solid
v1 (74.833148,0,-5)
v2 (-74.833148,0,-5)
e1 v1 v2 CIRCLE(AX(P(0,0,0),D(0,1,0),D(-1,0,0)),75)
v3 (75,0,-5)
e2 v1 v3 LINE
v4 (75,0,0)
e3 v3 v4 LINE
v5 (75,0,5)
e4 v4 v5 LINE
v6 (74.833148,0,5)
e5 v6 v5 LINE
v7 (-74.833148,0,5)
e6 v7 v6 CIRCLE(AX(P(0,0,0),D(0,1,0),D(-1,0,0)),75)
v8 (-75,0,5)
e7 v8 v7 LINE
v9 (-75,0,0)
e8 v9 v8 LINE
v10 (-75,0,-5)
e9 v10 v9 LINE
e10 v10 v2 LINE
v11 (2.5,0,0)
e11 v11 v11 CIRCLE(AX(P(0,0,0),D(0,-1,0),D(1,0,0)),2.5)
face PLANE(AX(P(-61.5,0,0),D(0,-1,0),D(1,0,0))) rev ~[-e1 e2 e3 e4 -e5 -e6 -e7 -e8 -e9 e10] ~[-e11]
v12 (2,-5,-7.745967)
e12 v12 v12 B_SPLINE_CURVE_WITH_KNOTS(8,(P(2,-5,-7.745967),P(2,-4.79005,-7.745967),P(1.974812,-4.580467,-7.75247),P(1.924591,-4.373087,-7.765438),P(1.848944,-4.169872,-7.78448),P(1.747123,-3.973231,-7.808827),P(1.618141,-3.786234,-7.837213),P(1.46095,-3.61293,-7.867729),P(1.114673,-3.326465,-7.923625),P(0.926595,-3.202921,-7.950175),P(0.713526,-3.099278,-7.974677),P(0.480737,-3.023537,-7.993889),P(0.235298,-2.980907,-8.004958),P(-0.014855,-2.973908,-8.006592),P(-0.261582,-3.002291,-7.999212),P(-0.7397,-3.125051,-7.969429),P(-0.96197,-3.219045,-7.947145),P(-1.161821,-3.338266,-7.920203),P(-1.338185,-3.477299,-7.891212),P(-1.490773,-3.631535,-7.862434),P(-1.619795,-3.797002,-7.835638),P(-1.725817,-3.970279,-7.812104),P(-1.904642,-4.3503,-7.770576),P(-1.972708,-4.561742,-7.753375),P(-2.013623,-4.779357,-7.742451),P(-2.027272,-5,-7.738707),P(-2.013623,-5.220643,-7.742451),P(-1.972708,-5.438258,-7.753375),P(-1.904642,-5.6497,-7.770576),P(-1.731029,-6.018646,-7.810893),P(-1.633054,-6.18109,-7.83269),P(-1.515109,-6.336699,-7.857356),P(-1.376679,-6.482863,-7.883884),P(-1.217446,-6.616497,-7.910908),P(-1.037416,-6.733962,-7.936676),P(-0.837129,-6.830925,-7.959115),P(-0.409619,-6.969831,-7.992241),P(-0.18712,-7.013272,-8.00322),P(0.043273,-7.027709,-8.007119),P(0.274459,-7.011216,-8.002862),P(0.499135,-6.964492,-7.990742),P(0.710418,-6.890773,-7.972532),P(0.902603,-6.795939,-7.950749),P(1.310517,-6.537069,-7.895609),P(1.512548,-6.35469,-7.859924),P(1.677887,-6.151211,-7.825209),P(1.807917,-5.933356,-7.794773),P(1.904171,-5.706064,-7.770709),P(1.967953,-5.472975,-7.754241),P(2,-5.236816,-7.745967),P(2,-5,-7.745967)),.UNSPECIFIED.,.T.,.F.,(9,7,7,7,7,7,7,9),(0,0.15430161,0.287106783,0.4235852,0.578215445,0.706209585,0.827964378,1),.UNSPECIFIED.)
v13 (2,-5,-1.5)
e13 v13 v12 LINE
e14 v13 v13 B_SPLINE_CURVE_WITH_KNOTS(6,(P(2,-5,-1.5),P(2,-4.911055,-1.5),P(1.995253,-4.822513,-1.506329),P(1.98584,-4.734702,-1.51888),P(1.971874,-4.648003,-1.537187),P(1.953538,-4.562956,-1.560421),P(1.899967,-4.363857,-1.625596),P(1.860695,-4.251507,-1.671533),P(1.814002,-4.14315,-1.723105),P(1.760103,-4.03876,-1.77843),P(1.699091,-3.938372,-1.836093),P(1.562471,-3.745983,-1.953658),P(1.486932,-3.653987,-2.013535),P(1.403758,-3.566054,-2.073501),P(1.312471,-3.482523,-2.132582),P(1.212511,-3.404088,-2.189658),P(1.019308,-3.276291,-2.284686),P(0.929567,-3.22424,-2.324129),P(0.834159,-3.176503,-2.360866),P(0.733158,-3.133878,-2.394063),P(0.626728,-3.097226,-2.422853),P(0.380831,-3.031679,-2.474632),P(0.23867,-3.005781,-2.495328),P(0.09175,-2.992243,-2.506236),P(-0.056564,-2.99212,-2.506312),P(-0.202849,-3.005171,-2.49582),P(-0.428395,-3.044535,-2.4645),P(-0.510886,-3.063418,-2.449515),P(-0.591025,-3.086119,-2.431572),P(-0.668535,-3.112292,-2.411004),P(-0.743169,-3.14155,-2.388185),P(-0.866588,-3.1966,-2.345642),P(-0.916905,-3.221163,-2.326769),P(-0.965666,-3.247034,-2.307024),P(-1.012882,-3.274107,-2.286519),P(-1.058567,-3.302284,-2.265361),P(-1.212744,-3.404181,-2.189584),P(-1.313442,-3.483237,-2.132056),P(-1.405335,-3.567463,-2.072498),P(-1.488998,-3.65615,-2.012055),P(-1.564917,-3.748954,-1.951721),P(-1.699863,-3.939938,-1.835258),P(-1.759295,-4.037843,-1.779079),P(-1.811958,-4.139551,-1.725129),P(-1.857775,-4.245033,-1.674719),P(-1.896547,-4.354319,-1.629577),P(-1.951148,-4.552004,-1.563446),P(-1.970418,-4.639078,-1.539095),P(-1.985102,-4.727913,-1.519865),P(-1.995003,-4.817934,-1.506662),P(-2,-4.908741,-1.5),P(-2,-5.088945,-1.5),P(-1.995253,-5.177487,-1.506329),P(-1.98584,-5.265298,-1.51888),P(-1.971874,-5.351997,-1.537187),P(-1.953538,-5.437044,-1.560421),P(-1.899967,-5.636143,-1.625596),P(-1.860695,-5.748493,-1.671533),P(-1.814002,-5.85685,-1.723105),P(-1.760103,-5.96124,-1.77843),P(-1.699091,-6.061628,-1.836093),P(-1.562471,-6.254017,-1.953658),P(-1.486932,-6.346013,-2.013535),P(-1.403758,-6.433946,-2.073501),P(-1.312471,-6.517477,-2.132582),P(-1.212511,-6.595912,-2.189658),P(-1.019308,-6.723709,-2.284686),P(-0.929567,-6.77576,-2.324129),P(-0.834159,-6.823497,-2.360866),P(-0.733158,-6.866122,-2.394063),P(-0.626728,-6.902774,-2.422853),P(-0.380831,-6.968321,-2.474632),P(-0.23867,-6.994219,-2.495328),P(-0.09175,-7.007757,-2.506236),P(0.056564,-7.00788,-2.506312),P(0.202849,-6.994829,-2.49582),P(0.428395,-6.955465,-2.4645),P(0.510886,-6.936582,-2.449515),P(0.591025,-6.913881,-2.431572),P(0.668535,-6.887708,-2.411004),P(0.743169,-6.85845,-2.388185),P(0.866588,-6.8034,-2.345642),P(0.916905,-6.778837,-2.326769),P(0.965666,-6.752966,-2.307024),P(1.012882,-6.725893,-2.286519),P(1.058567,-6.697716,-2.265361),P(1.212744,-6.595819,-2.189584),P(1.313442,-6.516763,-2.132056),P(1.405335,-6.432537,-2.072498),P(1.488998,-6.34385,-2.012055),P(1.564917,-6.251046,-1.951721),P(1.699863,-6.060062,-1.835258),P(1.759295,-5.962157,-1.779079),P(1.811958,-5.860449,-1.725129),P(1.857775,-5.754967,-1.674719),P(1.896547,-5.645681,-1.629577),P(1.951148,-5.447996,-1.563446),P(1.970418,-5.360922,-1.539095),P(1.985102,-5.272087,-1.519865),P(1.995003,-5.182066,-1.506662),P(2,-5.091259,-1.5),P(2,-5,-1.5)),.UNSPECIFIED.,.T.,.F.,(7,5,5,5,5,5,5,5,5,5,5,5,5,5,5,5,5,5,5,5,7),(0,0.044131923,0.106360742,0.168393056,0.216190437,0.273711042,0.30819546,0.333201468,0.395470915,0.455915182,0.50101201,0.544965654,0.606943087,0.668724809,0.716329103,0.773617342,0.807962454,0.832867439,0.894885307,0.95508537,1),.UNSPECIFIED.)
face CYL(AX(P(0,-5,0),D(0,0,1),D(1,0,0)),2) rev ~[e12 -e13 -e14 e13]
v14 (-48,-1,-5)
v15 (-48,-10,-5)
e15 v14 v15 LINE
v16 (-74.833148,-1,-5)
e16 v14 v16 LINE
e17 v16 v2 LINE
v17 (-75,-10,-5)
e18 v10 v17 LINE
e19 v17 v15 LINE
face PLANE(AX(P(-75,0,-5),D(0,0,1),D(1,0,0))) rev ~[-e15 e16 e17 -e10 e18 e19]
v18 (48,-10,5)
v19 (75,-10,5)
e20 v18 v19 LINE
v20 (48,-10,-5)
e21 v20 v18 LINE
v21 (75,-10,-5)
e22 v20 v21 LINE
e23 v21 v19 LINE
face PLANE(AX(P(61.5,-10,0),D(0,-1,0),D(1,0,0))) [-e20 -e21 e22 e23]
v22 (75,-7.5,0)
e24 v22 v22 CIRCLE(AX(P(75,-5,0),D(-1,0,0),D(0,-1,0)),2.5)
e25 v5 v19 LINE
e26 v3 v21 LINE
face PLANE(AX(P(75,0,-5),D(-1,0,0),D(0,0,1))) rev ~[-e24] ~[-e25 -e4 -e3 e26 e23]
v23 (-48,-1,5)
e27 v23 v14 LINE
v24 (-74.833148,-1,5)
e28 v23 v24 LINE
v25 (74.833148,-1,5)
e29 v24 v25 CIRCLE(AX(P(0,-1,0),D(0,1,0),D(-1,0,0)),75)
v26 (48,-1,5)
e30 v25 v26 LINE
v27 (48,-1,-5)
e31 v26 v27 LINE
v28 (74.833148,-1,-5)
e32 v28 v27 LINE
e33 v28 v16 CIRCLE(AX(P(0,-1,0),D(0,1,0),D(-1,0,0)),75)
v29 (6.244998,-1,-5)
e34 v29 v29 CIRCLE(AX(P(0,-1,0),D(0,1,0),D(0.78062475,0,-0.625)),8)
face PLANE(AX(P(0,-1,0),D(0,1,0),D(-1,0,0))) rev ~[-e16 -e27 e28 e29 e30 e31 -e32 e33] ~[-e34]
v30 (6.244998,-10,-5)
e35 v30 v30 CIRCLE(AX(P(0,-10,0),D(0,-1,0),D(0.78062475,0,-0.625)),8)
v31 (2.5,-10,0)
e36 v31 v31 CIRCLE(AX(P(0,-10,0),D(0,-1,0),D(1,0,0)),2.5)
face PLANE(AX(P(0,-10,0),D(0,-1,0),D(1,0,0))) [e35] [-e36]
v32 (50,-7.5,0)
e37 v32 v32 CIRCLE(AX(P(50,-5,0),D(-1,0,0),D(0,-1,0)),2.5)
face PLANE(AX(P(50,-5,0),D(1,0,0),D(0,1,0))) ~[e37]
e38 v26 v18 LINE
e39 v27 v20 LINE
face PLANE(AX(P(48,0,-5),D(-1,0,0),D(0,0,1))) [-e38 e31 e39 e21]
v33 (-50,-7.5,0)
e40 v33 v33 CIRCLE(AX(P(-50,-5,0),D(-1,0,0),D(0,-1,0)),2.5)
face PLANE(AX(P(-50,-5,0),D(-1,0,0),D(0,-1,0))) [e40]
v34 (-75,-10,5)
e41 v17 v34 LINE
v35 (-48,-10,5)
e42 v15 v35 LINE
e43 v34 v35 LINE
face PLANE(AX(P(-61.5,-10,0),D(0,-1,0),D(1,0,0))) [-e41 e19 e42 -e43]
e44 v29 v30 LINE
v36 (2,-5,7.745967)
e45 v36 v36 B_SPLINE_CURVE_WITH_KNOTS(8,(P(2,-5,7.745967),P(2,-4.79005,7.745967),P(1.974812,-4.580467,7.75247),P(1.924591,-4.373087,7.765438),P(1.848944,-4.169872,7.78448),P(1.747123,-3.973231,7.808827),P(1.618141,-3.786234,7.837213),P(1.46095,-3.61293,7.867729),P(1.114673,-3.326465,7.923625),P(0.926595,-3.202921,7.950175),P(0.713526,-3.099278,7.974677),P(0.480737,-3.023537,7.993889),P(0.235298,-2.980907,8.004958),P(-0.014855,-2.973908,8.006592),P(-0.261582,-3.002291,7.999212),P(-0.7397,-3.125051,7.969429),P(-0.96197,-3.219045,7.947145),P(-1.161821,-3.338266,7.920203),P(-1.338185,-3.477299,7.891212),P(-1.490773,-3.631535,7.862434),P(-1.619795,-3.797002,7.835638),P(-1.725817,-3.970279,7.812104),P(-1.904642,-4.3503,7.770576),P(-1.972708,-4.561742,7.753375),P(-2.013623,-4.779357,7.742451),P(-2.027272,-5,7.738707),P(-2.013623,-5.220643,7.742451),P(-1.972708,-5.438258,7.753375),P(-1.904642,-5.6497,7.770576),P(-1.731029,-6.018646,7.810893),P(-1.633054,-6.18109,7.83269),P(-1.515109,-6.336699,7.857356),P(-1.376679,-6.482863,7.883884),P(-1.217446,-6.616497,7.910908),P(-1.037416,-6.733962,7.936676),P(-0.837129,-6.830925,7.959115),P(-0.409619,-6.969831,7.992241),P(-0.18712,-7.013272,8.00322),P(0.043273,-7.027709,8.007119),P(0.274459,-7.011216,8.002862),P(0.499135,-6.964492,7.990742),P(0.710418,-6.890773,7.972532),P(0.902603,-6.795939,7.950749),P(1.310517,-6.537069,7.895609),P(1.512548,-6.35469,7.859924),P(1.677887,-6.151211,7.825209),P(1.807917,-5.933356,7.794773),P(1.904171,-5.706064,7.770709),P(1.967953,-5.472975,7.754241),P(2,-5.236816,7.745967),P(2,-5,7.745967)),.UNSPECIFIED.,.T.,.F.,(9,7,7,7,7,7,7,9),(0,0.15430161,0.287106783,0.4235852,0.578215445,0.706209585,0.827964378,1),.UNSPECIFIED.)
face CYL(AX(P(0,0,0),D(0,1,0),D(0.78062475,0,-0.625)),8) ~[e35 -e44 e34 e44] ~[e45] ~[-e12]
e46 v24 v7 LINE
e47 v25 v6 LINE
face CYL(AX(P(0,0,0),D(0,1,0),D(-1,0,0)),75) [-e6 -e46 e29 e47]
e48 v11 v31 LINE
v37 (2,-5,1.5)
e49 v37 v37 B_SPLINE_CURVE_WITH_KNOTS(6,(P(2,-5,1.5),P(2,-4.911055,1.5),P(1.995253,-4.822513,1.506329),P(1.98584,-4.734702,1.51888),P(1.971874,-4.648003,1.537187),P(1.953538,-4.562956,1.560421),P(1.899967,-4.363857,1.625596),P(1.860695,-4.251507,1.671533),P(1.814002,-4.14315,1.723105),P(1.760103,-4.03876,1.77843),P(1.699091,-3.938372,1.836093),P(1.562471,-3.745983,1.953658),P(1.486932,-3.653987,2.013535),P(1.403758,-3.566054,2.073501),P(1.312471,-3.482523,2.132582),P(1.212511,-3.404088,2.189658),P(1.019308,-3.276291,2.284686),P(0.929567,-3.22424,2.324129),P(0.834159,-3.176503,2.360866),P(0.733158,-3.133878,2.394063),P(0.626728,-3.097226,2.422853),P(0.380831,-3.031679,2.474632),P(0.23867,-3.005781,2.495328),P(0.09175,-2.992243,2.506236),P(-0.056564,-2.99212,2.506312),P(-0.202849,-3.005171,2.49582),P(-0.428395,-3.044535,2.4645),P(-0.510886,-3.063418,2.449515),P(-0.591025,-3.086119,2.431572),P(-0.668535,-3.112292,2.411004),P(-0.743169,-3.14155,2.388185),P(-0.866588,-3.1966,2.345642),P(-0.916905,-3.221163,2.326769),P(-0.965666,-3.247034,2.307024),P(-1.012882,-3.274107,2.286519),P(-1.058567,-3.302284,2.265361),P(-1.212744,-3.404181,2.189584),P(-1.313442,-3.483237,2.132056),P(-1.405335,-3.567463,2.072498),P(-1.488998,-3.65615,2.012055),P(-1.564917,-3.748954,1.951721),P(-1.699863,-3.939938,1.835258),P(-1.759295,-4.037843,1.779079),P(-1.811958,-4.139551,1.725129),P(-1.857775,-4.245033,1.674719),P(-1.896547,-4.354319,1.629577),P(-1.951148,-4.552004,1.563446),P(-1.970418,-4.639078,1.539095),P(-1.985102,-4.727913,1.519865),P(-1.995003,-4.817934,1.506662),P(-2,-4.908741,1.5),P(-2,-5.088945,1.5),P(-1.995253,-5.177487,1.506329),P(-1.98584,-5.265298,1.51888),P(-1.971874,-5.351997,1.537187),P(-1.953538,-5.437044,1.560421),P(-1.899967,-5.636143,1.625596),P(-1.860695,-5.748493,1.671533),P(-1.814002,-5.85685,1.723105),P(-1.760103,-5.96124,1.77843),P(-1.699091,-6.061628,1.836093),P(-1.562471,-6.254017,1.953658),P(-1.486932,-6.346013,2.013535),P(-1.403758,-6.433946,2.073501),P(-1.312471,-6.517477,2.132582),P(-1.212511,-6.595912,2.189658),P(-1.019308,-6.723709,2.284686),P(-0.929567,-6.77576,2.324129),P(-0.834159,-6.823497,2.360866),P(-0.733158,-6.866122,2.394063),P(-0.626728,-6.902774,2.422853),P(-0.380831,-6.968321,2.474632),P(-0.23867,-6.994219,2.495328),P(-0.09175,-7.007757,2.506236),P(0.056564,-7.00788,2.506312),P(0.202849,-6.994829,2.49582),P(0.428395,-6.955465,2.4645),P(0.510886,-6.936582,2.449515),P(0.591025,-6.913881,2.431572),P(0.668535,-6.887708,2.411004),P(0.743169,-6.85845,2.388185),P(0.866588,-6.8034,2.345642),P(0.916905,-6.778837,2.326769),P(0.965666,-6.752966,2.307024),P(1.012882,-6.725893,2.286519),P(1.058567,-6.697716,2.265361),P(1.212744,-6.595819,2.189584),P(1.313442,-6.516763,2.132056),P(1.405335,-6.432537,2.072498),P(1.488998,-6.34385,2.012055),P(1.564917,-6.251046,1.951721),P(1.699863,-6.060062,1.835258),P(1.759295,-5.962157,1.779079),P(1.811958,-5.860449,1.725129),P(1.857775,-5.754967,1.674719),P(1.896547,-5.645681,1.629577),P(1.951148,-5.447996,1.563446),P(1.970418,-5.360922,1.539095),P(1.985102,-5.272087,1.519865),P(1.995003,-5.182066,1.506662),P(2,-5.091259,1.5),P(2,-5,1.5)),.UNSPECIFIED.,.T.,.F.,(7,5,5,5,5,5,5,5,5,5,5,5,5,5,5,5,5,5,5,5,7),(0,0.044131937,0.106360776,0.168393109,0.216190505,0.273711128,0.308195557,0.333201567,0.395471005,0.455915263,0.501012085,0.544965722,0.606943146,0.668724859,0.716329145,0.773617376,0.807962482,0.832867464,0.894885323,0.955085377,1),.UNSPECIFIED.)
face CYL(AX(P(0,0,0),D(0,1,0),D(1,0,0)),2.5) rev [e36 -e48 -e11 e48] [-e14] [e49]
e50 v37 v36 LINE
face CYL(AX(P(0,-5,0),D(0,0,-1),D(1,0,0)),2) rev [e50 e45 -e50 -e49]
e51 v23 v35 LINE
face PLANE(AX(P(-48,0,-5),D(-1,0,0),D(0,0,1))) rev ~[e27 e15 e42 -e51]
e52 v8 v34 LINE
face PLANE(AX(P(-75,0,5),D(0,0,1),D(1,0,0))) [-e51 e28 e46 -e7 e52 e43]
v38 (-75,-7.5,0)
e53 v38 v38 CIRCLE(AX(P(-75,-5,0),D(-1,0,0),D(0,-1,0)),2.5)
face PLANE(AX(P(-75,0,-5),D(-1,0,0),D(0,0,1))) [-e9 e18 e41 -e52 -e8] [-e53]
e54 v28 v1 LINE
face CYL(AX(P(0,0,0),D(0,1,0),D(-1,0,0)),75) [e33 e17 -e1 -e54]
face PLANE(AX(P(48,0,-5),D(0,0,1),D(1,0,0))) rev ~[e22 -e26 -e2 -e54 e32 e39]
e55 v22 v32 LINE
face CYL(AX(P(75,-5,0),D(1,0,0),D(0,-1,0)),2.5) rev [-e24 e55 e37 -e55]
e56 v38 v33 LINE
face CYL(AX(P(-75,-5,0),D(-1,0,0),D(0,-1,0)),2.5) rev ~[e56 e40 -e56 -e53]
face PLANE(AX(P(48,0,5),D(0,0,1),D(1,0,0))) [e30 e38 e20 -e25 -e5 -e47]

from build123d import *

# Parameters (mm, degrees)
F0_W          = 27
F0_H          = 10
F1_DEPTH      = 10
F0_R          = 2.5
F2_R          = 75
F2_R_2        = 2.5
F3_DEPTH      = 1
F4_R          = 2.5
F5_DEPTH      = 25
F6_R          = 2
F7_DEPTH      = 75.001
F7_DEPTH_BACK = 75.001


# Not quite as in the source:
# - a pattern or mirror of a feature is missing from the dataset's text; its kind, count and spacing are read off the source's solid


with BuildPart() as f1:
    # F0 (on Front) → F1 (new body)
    with BuildSketch(Plane.XZ):
        with Locations((61.5, 0)):
            Rectangle(F0_W, F0_H)
    extrude(amount=F1_DEPTH)



with BuildPart() as f1b:
    # F0 (on Front) → F1, piece 2 (new body)
    with BuildSketch(Plane.XZ):
        with Locations((-61.5, 0)):
            Rectangle(F0_W, F0_H)
    extrude(amount=F1_DEPTH)


with BuildPart() as f1c:
    # F0 (on Front) → F1, piece 3 (new body)
    with BuildSketch(Plane.XZ):
        with BuildLine():
            ThreePointArc((6.2449979984, 5), (0, 8), (-6.2449979984, 5))
            ThreePointArc((-6.2449979984, 5), (-8, 0), (-6.2449979984, -5))
            ThreePointArc((-6.2449979984, -5), (0, -8), (6.2449979984, -5))
            ThreePointArc((6.2449979984, -5), (8, 0), (6.2449979984, 5))
        make_face()
        Circle(F0_R, mode=Mode.SUBTRACT)
    extrude(amount=F1_DEPTH)


with BuildPart() as f1_1:
    add(f1.part)

    add(f1b.part)  # F3 merges F1b

    add(f1c.part)  # F3 merges F1c
    # F2 (on face) → F3 (join)
    with BuildSketch(Plane(origin=(0, 0, 0), x_dir=(-1, 0, 0), z_dir=(0, 1, 0))):
        Circle(F2_R)
        Circle(F2_R_2, mode=Mode.SUBTRACT)
    extrude(amount=-F3_DEPTH)

    # F4 (on face) → F5 (cut)
    with BuildSketch(Plane(origin=(-75, 0, 0), x_dir=(0, -1, 0), z_dir=(-1, 0, 0))):
        with Locations((5, 0)):
            Circle(F4_R)
    f5 = extrude(amount=-F5_DEPTH, mode=Mode.SUBTRACT)

    # F5_copies: F5 across plane
    add(f5.mirror(Plane(origin=(0, 0, 0), x_dir=(0, 0, 1), z_dir=(1, 0, 0))), mode=Mode.SUBTRACT)

    # F6 (on Top) → F7 (cut, two sides)
    with BuildSketch(Plane.XY) as f7_sk:
        with Locations((0, -5)):
            Circle(F6_R)
    extrude(amount=-F7_DEPTH, mode=Mode.SUBTRACT)
    extrude(f7_sk.sketch, amount=F7_DEPTH_BACK, mode=Mode.SUBTRACT)


solid = f1_1.part
